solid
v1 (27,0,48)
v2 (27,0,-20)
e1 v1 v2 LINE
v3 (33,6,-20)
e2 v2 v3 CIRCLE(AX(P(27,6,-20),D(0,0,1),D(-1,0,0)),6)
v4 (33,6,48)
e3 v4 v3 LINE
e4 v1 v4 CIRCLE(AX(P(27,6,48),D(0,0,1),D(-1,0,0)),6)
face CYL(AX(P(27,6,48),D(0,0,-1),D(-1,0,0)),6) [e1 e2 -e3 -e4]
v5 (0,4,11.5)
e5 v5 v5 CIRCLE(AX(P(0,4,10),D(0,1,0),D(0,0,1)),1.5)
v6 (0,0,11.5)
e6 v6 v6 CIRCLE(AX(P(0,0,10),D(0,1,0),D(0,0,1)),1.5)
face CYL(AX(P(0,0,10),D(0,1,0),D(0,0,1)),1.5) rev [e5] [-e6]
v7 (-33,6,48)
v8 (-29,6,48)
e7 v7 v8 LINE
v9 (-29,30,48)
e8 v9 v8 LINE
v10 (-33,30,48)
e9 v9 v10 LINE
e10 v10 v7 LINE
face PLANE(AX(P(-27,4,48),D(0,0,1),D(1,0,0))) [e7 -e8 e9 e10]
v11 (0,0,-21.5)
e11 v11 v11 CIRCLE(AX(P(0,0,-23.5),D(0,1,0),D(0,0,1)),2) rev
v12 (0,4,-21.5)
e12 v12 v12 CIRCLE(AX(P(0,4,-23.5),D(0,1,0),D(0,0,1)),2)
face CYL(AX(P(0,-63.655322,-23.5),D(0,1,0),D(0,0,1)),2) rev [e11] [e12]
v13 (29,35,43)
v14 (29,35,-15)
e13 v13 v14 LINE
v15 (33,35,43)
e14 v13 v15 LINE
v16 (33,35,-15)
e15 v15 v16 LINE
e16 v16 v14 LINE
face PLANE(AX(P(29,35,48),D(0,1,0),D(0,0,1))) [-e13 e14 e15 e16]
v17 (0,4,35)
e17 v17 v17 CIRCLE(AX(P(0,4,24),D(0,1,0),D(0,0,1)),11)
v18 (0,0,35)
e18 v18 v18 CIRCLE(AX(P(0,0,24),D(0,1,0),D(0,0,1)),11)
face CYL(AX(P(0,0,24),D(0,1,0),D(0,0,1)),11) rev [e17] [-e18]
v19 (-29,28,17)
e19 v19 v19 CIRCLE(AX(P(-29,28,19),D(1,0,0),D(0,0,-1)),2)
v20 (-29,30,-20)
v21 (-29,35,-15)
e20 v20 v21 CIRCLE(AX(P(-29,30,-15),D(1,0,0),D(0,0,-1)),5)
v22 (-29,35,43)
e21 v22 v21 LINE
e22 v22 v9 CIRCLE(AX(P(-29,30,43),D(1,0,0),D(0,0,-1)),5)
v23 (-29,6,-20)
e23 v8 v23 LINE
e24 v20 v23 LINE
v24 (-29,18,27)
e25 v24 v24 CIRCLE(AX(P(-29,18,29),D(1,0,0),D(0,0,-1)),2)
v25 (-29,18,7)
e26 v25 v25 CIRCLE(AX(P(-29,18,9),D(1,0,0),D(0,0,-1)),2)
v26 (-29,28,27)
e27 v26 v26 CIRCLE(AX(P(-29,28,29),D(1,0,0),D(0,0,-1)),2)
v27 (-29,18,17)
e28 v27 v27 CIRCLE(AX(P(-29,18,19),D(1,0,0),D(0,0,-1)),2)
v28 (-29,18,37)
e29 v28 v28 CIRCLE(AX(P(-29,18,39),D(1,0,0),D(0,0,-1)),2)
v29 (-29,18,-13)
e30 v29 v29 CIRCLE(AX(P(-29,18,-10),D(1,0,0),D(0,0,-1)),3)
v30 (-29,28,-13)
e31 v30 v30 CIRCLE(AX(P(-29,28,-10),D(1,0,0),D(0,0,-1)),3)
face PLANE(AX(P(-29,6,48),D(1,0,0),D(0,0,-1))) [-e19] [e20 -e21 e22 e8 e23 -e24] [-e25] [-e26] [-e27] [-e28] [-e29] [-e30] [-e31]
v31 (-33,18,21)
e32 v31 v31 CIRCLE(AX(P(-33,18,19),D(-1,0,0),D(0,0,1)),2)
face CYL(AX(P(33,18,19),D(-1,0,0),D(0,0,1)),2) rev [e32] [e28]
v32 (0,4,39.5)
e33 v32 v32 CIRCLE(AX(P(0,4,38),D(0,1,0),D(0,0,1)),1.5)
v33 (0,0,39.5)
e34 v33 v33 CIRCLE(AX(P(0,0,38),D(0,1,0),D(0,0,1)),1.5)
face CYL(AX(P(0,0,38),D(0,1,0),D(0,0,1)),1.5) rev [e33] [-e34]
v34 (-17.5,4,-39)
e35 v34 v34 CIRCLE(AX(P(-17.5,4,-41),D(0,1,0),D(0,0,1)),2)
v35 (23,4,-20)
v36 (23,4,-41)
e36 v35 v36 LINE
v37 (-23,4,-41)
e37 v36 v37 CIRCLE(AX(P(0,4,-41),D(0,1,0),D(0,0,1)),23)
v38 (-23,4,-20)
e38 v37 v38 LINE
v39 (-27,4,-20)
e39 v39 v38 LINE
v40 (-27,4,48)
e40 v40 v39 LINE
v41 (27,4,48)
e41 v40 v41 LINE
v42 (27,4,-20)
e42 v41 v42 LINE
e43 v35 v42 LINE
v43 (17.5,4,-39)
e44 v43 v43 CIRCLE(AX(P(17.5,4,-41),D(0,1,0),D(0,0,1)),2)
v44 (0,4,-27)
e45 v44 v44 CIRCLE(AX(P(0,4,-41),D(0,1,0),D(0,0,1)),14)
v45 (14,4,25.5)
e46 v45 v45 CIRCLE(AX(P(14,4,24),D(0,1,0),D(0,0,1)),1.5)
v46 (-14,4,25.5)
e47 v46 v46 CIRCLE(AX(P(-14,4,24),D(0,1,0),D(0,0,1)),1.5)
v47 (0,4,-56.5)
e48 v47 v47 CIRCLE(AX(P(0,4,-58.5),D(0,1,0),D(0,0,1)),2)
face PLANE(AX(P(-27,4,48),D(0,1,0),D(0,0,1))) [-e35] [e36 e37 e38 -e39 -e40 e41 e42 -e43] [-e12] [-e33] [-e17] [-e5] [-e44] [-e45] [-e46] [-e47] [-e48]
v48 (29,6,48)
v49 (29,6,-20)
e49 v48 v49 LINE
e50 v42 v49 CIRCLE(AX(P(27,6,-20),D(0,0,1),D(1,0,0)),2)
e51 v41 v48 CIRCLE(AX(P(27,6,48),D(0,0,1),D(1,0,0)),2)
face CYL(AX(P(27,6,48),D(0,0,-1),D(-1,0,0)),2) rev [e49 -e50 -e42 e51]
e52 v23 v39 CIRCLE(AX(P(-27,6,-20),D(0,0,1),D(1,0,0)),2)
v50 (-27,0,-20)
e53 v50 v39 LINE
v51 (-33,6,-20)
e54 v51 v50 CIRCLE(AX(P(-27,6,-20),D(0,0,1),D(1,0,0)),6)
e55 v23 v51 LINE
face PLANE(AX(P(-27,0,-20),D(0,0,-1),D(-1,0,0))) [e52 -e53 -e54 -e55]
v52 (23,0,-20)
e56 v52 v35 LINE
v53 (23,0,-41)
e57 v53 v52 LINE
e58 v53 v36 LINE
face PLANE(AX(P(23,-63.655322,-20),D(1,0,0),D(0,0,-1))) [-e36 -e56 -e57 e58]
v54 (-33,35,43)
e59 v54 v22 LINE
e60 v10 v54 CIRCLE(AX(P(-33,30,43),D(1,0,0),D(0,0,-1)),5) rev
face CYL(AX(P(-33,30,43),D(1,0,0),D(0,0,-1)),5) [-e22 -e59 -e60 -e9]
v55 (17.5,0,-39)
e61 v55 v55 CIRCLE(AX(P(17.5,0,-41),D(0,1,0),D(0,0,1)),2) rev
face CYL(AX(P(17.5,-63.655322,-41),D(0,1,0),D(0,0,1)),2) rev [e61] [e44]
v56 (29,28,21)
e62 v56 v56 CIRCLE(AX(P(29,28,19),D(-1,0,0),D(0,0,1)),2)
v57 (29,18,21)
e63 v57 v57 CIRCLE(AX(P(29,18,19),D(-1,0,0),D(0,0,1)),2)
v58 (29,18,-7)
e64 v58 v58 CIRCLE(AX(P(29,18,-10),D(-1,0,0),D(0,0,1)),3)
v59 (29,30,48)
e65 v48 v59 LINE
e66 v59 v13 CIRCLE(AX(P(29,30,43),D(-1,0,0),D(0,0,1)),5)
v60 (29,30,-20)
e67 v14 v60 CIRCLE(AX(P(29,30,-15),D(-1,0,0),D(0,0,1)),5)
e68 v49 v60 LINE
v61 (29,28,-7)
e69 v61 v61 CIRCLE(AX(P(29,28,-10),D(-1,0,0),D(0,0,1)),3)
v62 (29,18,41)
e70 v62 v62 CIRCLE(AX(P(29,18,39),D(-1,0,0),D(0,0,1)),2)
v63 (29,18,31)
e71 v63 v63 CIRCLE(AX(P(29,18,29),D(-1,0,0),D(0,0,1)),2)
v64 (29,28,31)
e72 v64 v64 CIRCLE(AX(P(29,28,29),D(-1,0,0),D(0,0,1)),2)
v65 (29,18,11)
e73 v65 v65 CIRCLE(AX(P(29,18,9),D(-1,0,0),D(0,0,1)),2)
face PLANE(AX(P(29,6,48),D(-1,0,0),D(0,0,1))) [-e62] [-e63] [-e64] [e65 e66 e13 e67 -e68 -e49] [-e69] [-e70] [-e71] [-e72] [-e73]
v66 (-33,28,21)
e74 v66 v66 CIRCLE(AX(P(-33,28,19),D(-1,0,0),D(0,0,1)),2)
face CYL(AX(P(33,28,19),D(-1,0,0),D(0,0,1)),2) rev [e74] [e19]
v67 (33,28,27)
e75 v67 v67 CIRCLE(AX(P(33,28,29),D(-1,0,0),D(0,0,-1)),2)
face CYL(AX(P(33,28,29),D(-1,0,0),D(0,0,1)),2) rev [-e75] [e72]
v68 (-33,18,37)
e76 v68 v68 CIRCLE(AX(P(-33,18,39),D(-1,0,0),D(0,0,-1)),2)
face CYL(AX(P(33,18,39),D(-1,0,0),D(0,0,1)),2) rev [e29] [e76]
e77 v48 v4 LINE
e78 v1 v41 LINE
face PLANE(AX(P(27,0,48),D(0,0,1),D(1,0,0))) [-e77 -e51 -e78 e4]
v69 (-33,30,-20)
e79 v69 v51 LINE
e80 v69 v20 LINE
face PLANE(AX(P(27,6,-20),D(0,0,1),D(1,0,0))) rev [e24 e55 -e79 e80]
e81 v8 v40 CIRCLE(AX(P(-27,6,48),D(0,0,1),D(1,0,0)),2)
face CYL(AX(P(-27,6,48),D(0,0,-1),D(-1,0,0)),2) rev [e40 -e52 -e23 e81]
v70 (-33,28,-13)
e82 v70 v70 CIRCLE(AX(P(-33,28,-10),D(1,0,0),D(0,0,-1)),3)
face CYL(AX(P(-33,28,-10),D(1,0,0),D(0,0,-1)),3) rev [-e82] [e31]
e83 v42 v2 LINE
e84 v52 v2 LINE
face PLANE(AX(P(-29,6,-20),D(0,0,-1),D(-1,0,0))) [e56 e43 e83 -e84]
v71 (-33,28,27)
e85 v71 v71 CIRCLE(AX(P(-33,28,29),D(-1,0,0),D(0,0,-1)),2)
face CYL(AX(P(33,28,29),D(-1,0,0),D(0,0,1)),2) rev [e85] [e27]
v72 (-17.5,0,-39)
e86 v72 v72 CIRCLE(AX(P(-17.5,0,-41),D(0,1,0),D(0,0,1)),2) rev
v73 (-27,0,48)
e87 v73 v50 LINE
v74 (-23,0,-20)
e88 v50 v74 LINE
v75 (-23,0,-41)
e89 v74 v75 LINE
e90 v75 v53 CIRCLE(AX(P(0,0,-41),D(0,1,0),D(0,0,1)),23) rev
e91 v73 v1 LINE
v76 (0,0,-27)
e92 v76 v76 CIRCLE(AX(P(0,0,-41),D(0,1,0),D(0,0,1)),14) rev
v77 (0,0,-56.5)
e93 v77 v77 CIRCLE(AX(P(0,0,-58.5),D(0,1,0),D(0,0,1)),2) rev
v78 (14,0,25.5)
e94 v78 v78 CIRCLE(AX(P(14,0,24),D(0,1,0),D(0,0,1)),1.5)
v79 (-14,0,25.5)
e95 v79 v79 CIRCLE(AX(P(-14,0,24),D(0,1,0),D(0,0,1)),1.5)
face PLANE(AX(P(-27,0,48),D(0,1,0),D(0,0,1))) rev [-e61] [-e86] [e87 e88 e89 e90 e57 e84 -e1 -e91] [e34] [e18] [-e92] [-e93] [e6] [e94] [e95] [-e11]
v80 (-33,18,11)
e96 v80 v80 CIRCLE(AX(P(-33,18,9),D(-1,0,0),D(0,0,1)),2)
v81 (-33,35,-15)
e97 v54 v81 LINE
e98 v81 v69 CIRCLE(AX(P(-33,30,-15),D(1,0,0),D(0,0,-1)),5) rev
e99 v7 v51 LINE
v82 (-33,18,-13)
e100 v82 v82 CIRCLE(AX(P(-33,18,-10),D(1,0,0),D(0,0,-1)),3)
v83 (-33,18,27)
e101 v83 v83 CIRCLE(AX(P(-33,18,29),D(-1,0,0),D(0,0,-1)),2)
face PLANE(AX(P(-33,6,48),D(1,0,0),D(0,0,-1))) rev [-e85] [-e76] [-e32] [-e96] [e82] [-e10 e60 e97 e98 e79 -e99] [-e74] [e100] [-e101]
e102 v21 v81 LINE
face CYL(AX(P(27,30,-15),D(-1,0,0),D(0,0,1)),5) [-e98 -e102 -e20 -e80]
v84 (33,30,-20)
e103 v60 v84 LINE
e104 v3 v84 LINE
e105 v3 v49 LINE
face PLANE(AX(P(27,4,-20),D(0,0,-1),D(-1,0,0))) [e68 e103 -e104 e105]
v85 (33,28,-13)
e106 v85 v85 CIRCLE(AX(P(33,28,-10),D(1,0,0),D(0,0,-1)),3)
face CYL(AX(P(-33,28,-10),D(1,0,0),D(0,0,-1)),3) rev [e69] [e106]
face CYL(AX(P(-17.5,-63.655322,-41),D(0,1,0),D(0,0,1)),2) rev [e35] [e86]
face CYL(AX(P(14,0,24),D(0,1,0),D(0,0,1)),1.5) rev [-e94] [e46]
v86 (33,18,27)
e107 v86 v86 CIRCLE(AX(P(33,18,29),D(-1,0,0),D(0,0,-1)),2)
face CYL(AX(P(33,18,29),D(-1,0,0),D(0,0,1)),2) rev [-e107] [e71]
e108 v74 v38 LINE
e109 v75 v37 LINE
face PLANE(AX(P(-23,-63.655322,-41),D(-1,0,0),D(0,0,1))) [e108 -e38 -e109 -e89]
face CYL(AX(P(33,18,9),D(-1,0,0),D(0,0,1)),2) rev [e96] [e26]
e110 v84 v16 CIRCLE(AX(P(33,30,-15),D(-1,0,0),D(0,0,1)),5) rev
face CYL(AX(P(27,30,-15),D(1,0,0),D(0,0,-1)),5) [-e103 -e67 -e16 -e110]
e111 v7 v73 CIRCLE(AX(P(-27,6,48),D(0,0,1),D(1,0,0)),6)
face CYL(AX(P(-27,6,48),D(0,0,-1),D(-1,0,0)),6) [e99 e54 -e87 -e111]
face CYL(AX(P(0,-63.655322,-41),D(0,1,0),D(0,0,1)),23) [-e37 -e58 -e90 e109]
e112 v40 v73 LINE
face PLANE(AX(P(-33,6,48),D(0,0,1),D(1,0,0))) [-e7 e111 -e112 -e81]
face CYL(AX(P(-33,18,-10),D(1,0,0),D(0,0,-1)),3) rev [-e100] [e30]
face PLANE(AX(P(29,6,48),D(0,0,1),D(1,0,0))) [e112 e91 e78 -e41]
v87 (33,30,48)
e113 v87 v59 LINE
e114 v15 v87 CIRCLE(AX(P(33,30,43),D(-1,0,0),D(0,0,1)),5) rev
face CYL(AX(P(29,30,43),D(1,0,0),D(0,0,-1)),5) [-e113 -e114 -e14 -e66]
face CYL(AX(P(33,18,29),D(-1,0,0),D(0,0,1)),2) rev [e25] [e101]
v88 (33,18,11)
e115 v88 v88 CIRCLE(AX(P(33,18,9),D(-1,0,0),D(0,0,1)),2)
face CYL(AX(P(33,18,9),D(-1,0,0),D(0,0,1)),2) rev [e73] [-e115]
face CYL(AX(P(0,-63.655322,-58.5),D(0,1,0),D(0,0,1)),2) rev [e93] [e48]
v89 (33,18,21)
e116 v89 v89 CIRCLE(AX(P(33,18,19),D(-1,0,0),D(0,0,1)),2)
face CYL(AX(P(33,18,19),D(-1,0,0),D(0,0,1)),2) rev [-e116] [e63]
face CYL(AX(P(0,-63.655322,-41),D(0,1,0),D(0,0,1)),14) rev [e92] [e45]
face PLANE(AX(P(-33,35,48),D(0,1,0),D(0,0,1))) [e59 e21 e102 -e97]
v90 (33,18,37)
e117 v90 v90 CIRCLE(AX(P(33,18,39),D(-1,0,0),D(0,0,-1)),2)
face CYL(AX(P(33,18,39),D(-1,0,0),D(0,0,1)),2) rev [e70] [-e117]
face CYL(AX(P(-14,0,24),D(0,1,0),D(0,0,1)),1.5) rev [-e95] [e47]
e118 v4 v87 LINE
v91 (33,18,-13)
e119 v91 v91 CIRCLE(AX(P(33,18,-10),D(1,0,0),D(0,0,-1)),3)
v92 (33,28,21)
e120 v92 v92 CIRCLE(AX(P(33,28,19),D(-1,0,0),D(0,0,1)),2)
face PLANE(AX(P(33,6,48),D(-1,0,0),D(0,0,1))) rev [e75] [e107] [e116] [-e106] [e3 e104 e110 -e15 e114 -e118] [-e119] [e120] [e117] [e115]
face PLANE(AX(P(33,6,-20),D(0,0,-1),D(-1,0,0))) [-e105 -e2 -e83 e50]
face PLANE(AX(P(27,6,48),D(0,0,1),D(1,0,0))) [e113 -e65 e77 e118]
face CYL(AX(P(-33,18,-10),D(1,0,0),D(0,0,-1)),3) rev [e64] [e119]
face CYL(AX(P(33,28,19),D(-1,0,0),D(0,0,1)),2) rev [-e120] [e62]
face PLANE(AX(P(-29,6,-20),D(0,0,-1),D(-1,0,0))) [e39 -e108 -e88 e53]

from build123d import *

# Parameters (mm, degrees)
SM_BASE_FLANGE_2_DEPTH      = 48
SM_BASE_FLANGE_2_DEPTH_BACK = 20
SKETCH_8_R                  = 11
SKETCH_8_R_2                = 1.5
CUT_EXTRUDE_1_DEPTH         = 66.984846745
SKETCH_10_R                 = 14
SKETCH_10_R_2               = 2
EXTRUDE_1_DEPTH             = 4
SKETCH_11_R                 = 2
CUT_EXTRUDE_2_DEPTH         = 99.371743911
FILLET_1_R                  = 5
SKETCH_13_R                 = 3
CUT_EXTRUDE_3_DEPTH         = 99.371743911


# Sheet-metal steps are written as plain solids
with BuildPart() as part:
    # Sketch 1 → 基体-法兰2 (new, two sides: drawn at the far end of the back side and taken through both)
    with BuildSketch(Plane.XY.offset(-SM_BASE_FLANGE_2_DEPTH_BACK)):
        with BuildLine():
            Line((-33, 35), (-33, 6))
            ThreePointArc((-33, 6), (-31.242640687, 1.757359313), (-27, 0))
            Line((-27, 0), (27, 0))
            ThreePointArc((27, 0), (31.242640687, 1.757359313), (33, 6))
            Line((33, 6), (33, 35))
            Line((33, 35), (29, 35))
            Line((29, 35), (29, 6))
            ThreePointArc((29, 6), (28.414213562, 4.585786438), (27, 4))
            Line((27, 4), (-27, 4))
            ThreePointArc((-27, 4), (-28.414213562, 4.585786438), (-29, 6))
            Line((-29, 6), (-29, 35))
            Line((-29, 35), (-33, 35))
        make_face()
    extrude(amount=SM_BASE_FLANGE_2_DEPTH + SM_BASE_FLANGE_2_DEPTH_BACK)

    # 草图8 → 切除-拉伸1 (cut, through all)
    with BuildSketch(Plane(origin=(0, 4, 0), x_dir=(1, 0, 0), z_dir=(0, 1, 0))):
        with Locations(Location((0, -24, 0), (0, 0, 270))):
            Circle(SKETCH_8_R)
        with Locations(Location((0, -10, 0), (0, 0, 270))):
            Circle(SKETCH_8_R_2)
        with Locations(Location((14, -24, 0), (0, 0, 270))):
            Circle(SKETCH_8_R_2)
        with Locations(Location((0, -38, 0), (0, 0, 270))):
            Circle(SKETCH_8_R_2)
        with Locations(Location((-14, -24, 0), (0, 0, 270))):
            Circle(SKETCH_8_R_2)
    extrude(amount=-CUT_EXTRUDE_1_DEPTH, mode=Mode.SUBTRACT)

    # 草图10 → 凸台-拉伸1 (add)
    with BuildSketch(Plane(origin=(0, 4, 0), x_dir=(1, 0, 0), z_dir=(0, 1, 0))):
        with BuildLine():
            Line((-23, 41), (-23, 20))
            Line((-23, 20), (23, 20))
            Line((23, 20), (23, 41))
            ThreePointArc((23, 41), (0, 64), (-23, 41))
        make_face()
        with Locations(Location((0, 41, 0), (0, 0, 270))):
            Circle(SKETCH_10_R, mode=Mode.SUBTRACT)
        with Locations(Location((0, 58.5, 0), (0, 0, 270))):
            Circle(SKETCH_10_R_2, mode=Mode.SUBTRACT)
        with Locations(Location((17.5, 41, 0), (0, 0, 270))):
            Circle(SKETCH_10_R_2, mode=Mode.SUBTRACT)
        with Locations(Location((0, 23.5, 0), (0, 0, 270))):
            Circle(SKETCH_10_R_2, mode=Mode.SUBTRACT)
        with Locations(Location((-17.5, 41, 0), (0, 0, 270))):
            Circle(SKETCH_10_R_2, mode=Mode.SUBTRACT)
    extrude(amount=-EXTRUDE_1_DEPTH)

    # 草图11 → 切除-拉伸2 (cut, through all)
    with BuildSketch(Plane.ZY.offset(33)):
        with Locations((19, 18)):
            Circle(SKETCH_11_R)
        with Locations((9, 18)):
            Circle(SKETCH_11_R)
        with Locations(Location((29, 18, 0), (0, 0, 180))):
            Circle(SKETCH_11_R)
        with Locations(Location((39, 18, 0), (0, 0, 180))):
            Circle(SKETCH_11_R)
        with Locations((19, 28)):
            Circle(SKETCH_11_R)
        with Locations(Location((29, 28, 0), (0, 0, 180))):
            Circle(SKETCH_11_R)
    extrude(amount=-CUT_EXTRUDE_2_DEPTH, mode=Mode.SUBTRACT)

    # 圆角1
    fillet_1_edges = [part.edges().sort_by_distance(p)[0] for p in [
        (-31, 35, -20),
        (31, 35, -20),
        (-31, 35, 48),
        (31, 35, 48),
    ]]
    fillet(fillet_1_edges, radius=FILLET_1_R)

    # 草图13 → 切除-拉伸3 (cut, through all)
    with BuildSketch(Plane(origin=(33, 0, 0), x_dir=(0, 0, -1), z_dir=(1, 0, 0))):
        with Locations((10, 28)):
            Circle(SKETCH_13_R)
        with Locations((10, 18)):
            Circle(SKETCH_13_R)
    extrude(amount=-CUT_EXTRUDE_3_DEPTH, mode=Mode.SUBTRACT)


solid = part.part
